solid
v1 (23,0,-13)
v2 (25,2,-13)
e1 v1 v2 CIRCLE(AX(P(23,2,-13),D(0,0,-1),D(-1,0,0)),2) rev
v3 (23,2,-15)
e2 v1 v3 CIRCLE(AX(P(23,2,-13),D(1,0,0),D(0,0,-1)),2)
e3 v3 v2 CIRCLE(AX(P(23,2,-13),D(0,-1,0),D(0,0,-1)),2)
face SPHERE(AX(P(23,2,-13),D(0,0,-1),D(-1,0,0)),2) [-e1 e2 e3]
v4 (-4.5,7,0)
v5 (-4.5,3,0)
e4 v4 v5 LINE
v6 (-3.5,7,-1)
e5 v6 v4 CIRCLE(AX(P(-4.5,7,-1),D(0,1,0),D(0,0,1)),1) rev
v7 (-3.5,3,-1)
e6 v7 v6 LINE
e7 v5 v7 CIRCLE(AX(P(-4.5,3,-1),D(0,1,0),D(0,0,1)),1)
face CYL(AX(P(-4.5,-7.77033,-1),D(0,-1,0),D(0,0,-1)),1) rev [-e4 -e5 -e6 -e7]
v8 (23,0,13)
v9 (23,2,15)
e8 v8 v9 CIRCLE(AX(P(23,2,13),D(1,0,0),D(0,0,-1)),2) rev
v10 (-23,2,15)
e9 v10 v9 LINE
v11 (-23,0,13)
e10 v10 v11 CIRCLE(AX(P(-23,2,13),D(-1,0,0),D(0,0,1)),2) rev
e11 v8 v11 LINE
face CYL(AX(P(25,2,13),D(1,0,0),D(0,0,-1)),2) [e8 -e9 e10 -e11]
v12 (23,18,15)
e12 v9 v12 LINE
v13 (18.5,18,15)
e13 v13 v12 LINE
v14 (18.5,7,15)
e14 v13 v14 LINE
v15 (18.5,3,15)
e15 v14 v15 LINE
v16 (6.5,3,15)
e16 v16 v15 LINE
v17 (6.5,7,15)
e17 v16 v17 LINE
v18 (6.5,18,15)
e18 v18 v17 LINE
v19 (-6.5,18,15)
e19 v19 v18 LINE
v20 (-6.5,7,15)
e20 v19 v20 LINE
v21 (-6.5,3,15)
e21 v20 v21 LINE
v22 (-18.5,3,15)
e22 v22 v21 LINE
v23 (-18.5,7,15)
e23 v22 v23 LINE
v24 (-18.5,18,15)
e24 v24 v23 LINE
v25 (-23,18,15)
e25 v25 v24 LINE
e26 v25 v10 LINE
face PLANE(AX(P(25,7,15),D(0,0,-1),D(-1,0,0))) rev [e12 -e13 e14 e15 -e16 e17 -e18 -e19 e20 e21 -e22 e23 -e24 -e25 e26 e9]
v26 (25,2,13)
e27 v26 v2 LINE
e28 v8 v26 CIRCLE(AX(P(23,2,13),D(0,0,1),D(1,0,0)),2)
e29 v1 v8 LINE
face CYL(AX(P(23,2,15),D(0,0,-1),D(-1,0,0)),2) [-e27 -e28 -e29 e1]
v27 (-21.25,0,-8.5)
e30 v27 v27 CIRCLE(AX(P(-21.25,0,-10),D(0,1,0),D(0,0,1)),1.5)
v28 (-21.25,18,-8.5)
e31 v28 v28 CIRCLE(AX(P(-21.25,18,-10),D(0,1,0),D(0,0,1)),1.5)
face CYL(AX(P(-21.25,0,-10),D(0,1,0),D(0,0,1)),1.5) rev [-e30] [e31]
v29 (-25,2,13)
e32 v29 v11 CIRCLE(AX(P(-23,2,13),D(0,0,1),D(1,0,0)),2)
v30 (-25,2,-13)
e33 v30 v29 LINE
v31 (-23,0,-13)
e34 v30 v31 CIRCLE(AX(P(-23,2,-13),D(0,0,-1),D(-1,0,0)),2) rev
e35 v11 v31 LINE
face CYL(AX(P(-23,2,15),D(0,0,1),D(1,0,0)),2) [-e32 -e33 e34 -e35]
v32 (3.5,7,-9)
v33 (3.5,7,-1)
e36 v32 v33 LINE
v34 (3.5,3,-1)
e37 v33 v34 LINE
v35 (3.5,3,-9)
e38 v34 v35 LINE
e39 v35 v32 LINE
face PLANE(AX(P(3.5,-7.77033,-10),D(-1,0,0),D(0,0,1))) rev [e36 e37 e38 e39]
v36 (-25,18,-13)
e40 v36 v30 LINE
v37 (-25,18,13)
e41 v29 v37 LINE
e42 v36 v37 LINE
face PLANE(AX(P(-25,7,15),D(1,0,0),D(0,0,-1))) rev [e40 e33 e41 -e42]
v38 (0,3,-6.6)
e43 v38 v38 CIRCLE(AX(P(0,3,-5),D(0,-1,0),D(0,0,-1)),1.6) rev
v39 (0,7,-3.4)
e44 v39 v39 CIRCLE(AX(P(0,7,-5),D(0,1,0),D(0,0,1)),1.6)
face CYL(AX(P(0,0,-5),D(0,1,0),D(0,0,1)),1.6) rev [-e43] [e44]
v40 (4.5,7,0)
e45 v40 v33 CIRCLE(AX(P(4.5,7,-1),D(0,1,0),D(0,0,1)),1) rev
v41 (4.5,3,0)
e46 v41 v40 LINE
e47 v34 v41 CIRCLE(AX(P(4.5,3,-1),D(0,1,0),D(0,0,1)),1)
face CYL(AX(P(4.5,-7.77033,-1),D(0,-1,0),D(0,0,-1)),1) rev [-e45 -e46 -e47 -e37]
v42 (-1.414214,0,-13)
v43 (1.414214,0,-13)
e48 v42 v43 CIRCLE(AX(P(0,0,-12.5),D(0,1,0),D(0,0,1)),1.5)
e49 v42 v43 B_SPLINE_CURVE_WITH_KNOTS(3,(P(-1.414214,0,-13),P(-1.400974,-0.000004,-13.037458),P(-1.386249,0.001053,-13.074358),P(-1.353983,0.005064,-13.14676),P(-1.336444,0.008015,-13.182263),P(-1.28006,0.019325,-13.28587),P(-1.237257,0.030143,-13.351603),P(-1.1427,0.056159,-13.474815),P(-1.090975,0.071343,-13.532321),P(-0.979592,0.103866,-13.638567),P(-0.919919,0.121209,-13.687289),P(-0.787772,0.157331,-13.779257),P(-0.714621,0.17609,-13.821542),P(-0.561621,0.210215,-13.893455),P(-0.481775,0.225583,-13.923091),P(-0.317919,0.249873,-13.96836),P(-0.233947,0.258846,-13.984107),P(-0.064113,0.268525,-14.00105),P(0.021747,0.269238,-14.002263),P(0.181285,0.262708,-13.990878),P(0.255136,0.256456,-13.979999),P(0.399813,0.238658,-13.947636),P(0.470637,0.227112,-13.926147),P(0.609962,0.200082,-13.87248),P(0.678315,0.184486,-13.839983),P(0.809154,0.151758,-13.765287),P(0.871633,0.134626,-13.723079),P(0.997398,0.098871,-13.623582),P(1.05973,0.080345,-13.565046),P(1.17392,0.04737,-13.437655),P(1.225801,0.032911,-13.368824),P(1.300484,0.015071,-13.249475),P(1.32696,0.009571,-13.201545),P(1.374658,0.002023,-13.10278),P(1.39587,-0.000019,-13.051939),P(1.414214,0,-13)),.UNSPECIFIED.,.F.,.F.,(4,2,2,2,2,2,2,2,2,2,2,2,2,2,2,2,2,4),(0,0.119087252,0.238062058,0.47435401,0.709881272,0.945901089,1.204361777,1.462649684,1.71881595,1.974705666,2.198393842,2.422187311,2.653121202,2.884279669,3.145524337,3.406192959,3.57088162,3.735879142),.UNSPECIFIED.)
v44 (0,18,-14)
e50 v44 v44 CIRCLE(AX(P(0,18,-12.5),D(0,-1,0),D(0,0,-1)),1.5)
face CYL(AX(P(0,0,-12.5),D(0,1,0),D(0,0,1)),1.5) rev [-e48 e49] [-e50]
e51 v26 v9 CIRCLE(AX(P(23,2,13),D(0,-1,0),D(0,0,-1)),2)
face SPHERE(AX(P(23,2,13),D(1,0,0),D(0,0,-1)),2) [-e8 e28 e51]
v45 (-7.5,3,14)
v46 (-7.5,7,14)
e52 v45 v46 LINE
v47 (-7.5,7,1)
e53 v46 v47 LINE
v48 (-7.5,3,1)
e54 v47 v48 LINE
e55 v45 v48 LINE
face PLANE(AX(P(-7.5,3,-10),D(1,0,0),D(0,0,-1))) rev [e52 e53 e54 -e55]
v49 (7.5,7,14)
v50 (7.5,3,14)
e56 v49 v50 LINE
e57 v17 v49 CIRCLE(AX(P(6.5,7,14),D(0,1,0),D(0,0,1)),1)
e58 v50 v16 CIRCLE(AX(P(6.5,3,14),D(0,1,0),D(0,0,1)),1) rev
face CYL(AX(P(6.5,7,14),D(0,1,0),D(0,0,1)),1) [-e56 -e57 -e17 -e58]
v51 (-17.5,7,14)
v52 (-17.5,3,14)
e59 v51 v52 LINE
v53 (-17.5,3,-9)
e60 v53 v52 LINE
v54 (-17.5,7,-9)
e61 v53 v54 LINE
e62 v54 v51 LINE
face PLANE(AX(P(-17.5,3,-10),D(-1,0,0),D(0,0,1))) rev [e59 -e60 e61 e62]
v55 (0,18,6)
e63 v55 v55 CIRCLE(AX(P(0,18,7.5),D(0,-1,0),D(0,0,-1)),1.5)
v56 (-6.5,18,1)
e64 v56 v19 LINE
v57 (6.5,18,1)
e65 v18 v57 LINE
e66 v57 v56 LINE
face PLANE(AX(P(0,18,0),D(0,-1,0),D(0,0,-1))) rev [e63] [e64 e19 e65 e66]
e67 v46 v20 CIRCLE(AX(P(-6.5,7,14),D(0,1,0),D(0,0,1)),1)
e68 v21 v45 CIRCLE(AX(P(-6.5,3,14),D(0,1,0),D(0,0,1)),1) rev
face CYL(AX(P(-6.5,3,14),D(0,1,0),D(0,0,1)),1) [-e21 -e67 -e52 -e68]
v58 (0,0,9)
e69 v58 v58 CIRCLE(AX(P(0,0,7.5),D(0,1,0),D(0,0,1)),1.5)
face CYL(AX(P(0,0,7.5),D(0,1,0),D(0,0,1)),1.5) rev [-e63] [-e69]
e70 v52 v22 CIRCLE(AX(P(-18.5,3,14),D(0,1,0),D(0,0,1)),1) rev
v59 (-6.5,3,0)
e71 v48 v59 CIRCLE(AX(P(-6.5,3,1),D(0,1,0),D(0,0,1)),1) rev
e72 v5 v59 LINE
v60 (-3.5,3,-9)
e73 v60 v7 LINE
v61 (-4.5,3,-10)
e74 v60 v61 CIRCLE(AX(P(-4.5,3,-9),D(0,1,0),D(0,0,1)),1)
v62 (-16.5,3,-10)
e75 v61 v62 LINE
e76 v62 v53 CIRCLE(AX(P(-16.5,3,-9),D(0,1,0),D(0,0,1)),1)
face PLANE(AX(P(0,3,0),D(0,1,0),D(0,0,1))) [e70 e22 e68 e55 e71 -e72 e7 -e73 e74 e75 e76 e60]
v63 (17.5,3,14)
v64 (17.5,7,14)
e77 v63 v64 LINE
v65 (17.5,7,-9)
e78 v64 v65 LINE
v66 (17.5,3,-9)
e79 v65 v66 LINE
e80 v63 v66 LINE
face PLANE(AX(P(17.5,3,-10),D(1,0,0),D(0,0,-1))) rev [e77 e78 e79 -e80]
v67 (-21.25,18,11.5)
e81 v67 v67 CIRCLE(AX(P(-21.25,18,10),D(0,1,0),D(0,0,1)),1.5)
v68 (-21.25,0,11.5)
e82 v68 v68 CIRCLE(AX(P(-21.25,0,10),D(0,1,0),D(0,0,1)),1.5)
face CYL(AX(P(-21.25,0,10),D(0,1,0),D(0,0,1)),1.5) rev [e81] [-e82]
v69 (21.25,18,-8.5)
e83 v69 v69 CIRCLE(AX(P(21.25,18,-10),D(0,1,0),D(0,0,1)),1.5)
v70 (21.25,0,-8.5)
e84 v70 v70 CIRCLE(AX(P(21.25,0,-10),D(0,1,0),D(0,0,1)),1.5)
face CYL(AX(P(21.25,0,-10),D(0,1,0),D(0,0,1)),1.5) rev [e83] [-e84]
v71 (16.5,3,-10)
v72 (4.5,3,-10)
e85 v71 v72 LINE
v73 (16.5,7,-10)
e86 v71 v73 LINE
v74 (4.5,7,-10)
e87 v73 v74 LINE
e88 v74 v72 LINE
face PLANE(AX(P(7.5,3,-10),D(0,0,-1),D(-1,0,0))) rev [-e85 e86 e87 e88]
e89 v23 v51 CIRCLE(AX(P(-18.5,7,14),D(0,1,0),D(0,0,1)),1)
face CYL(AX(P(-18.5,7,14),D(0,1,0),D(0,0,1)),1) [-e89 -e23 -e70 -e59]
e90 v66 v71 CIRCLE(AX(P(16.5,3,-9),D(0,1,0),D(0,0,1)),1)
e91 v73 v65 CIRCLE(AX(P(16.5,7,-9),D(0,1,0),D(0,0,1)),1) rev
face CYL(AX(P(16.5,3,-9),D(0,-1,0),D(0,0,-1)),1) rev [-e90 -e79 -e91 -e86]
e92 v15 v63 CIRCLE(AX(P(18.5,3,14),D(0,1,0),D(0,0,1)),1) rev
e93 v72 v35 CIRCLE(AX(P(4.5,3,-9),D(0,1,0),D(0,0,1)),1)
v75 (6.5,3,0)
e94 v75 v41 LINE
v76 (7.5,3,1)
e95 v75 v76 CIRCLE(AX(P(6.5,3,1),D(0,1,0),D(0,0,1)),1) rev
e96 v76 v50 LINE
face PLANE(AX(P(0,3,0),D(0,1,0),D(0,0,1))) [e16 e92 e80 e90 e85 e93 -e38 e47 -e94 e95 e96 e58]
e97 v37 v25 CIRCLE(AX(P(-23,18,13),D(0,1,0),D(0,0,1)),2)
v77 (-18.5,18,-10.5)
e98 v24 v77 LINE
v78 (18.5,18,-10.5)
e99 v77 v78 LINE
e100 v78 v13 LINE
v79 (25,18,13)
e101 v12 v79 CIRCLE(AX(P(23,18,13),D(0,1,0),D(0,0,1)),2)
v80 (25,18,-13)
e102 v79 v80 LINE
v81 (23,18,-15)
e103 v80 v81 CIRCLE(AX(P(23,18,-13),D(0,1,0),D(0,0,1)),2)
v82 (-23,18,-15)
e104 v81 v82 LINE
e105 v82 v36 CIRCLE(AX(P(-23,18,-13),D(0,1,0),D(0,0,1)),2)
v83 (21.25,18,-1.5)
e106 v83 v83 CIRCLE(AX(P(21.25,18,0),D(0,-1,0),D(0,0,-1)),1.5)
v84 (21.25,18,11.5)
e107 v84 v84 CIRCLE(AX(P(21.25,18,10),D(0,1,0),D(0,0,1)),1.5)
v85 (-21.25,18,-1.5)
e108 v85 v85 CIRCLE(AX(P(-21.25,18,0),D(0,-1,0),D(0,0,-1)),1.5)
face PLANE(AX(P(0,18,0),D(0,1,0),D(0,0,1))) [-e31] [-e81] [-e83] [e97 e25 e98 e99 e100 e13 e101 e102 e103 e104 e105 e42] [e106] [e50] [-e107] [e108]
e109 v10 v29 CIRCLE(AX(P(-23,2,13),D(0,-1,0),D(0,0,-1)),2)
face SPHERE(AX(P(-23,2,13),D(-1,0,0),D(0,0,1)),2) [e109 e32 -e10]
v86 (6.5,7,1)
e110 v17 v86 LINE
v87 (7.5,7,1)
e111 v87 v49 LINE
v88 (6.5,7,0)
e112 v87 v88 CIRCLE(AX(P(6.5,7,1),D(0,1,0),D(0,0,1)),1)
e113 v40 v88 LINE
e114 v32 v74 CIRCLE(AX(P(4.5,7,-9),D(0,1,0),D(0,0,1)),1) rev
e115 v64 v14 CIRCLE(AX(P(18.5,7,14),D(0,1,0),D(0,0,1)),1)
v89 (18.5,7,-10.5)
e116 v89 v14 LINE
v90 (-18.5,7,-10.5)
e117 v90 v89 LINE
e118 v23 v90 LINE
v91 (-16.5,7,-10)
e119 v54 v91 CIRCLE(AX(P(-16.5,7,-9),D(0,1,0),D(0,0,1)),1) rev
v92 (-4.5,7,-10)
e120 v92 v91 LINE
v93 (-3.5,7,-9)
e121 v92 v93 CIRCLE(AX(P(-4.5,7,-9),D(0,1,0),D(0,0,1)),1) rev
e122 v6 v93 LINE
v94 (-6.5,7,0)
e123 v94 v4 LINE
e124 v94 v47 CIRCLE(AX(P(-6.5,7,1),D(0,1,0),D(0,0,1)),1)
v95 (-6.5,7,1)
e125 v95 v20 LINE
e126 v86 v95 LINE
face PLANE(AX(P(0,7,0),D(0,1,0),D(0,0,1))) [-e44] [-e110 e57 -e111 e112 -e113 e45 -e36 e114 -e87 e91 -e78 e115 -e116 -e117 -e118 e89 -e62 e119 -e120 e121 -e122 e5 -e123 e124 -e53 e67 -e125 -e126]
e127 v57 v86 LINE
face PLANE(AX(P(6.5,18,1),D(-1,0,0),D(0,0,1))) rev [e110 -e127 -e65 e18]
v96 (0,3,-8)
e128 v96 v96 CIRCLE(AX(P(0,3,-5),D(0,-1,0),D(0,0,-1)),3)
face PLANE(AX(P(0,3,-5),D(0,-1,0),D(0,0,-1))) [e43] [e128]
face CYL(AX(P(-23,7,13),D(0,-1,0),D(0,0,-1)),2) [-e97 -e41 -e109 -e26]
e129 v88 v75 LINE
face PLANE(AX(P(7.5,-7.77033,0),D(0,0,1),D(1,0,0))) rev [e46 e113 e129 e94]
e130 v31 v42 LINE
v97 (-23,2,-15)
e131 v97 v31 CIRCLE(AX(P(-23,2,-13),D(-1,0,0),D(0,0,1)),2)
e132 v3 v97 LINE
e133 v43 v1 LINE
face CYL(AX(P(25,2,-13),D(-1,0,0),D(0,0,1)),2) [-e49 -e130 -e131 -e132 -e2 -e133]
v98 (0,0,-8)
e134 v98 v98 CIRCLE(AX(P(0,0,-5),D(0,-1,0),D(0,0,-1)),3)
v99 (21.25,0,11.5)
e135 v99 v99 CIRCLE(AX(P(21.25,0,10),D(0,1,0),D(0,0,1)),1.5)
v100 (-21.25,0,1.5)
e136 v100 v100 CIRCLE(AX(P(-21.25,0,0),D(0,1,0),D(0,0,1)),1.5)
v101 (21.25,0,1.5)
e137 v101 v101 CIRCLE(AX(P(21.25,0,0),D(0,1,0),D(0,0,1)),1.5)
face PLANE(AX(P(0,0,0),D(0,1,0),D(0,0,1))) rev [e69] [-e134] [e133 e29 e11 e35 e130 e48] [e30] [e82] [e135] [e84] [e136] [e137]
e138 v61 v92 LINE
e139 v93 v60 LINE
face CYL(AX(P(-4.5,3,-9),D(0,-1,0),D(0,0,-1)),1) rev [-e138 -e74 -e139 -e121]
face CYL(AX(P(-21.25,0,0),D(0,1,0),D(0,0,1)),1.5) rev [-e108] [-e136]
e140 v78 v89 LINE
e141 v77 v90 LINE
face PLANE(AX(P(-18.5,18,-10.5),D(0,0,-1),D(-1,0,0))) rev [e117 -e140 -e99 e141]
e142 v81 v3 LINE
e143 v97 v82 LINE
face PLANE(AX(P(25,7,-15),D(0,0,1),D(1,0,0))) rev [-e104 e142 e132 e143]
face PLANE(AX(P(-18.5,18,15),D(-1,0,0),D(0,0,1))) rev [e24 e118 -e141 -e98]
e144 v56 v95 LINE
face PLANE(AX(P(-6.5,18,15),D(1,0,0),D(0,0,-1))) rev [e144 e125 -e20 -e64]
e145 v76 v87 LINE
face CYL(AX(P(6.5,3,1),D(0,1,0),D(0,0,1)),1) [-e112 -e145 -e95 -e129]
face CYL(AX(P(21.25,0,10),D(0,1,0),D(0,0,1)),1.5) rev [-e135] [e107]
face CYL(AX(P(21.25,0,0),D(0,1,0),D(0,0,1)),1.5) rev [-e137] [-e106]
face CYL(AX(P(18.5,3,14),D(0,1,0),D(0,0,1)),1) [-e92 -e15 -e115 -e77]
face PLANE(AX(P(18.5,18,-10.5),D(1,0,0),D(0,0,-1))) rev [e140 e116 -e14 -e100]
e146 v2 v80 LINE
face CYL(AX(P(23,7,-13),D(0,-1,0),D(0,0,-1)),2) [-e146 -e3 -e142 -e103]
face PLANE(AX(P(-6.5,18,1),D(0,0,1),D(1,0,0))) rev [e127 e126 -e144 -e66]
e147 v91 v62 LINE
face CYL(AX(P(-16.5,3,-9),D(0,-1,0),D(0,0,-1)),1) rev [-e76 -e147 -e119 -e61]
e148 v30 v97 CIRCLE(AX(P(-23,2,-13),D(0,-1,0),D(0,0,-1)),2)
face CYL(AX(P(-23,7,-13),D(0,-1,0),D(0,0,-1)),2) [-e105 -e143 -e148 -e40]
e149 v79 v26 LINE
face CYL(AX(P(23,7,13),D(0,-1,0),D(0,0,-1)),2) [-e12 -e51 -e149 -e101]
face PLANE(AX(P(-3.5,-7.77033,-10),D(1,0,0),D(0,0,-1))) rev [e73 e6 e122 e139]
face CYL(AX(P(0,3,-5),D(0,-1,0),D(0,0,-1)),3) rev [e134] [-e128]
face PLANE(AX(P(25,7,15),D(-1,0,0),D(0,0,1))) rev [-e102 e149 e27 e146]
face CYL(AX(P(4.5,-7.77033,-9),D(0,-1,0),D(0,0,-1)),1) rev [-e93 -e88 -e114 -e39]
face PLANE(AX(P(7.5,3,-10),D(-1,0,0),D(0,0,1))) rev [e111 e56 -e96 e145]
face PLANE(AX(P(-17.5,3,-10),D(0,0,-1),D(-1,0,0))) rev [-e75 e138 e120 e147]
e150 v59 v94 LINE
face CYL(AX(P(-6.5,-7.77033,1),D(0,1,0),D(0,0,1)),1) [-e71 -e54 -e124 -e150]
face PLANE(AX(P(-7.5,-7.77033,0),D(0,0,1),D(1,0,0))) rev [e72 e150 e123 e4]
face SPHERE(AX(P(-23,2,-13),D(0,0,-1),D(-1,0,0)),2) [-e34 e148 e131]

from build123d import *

# Parameters (mm, degrees)
SKETCH_1_W          = 50
SKETCH_1_H          = 30
EXTRUDE_1_DEPTH     = 7
SKETCH_2_W          = 10
SKETCH_2_H          = 25
CUT_EXTRUDE_1_DEPTH = 4
SKETCH_4_R          = 1.6
CUT_EXTRUDE_3_DEPTH = 30.983328701
SKETCH_5_R          = 3
CUT_EXTRUDE_4_DEPTH = 3
SKETCH_6_R          = 1.5
CUT_EXTRUDE_5_DEPTH = 30.983328701
SKETCH_7_W          = 13
SKETCH_7_H          = 14
EXTRUDE_6_DEPTH     = 11
SKETCH_8_R          = 1.5
CUT_EXTRUDE_6_DEPTH = 32.160872902
SKETCH_9_R          = 1.5
CUT_EXTRUDE_7_DEPTH = 35.263683398
FILLET_1_R          = 2
SKETCH_10_W         = 4
SKETCH_10_H         = 10
CUT_EXTRUDE_8_DEPTH = 4
FILLET_2_R          = 1
FILLET_3_R          = 1


with BuildPart() as part:
    # Эскиз1 → Бобышка-Вытянуть1 (new body)
    with BuildSketch(Plane(origin=(0, 0, 0), x_dir=(1, 0, 0), z_dir=(0, 1, 0))):
        Rectangle(SKETCH_1_W, SKETCH_1_H)
    extrude(amount=EXTRUDE_1_DEPTH)

    # Эскиз2 → Вырез-Вытянуть1 (cut)
    with BuildSketch(Plane(origin=(0, 7, 0), x_dir=(1, 0, 0), z_dir=(0, 1, 0))):
        with Locations((-12.5, -2.5)):
            Rectangle(SKETCH_2_W, SKETCH_2_H)
        with Locations((12.5, -2.5)):
            Rectangle(SKETCH_2_W, SKETCH_2_H)
    extrude(amount=-CUT_EXTRUDE_1_DEPTH, mode=Mode.SUBTRACT)

    # Эскиз4 → Вырез-Вытянуть3 (cut, through all)
    with BuildSketch(Plane(origin=(0, 7, 0), x_dir=(1, 0, 0), z_dir=(0, 1, 0))):
        with Locations(Location((0, 5, 0), (0, 0, 270))):
            Circle(SKETCH_4_R)
    extrude(amount=-CUT_EXTRUDE_3_DEPTH, mode=Mode.SUBTRACT)

    # Эскиз5 → Вырез-Вытянуть4 (cut)
    with BuildSketch(Plane.XZ):
        with Locations(Location((0, -5, 0), (0, 0, 270))):
            Circle(SKETCH_5_R)
    extrude(amount=-CUT_EXTRUDE_4_DEPTH, mode=Mode.SUBTRACT)

    # Эскиз6 → Вырез-Вытянуть5 (cut, through all)
    with BuildSketch(Plane(origin=(0, 7, 0), x_dir=(1, 0, 0), z_dir=(0, 1, 0))):
        with Locations(Location((-21.25, 0, 0), (0, 0, 270))):
            Circle(SKETCH_6_R)
        with Locations(Location((0, 12.5, 0), (0, 0, 270))):
            Circle(SKETCH_6_R)
        with Locations(Location((21.25, 0, 0), (0, 0, 270))):
            Circle(SKETCH_6_R)
        with Locations(Location((0, -7.5, 0), (0, 0, 270))):
            Circle(SKETCH_6_R)
    extrude(amount=-CUT_EXTRUDE_5_DEPTH, mode=Mode.SUBTRACT)

    # Эскиз7 → Бобышка-Вытянуть6 (add)
    with BuildSketch(Plane(origin=(0, 7, 0), x_dir=(1, 0, 0), z_dir=(0, 1, 0))):
        Polygon((-25, 15), (25, 15), (25, -15), (18.5, -15), (18.5, 10.5), (-18.5, 10.5), (-18.5, -15), (-25, -15), align=None)
        with Locations((0, -8)):
            Rectangle(SKETCH_7_W, SKETCH_7_H)
    extrude(amount=EXTRUDE_6_DEPTH)

    # Эскиз8 → Вырез-Вытянуть6 (cut, through all)
    with BuildSketch(Plane.XZ.offset(-7)):
        with Locations(Location((21.25, 0, 0), (0, 0, 90))):
            Circle(SKETCH_8_R)
        with Locations(Location((0, 7.5, 0), (0, 0, 90))):
            Circle(SKETCH_8_R)
        with Locations(Location((-21.25, 0, 0), (0, 0, 90))):
            Circle(SKETCH_8_R)
        with Locations(Location((0, -12.5, 0), (0, 0, 90))):
            Circle(SKETCH_8_R)
    extrude(amount=-CUT_EXTRUDE_6_DEPTH, mode=Mode.SUBTRACT)

    # Эскиз9 → Вырез-Вытянуть7 (cut, through all)
    with BuildSketch(Plane(origin=(0, 18, 0), x_dir=(1, 0, 0), z_dir=(0, 1, 0))):
        with Locations(Location((-21.25, 10, 0), (0, 0, 270))):
            Circle(SKETCH_9_R)
        with Locations(Location((21.25, 10, 0), (0, 0, 270))):
            Circle(SKETCH_9_R)
        with Locations(Location((21.25, -10, 0), (0, 0, 270))):
            Circle(SKETCH_9_R)
        with Locations(Location((-21.25, -10, 0), (0, 0, 270))):
            Circle(SKETCH_9_R)
    extrude(amount=-CUT_EXTRUDE_7_DEPTH, mode=Mode.SUBTRACT)

    # Скругление1
    # the kernel refuses this fillet: 2 mm, written as the material it takes off along each edge
    with BuildSketch(Plane(origin=(-23, 2, -13), x_dir=(0, -1, 0), z_dir=(-1, 0, 0))) as fillet_1_piece_1_section:
        Polygon((0, 0), (FILLET_1_R, 0), (FILLET_1_R, -FILLET_1_R), (0, -FILLET_1_R), align=None)
    fillet_1_piece_1 = extrude(amount=FILLET_1_R, mode=Mode.PRIVATE)
    fillet_1_piece_1 = fillet_1_piece_1 - Plane(origin=(-23, 2, -13), x_dir=(0, 0.7071067811865475, 0.7071067811865475), z_dir=(-1, 0, 0)) * Sphere(FILLET_1_R, mode=Mode.PRIVATE)
    add(fillet_1_piece_1, mode=Mode.SUBTRACT)
    with BuildSketch(Plane(origin=(23, 2, -13), x_dir=(1, 0, 0), z_dir=(0, -1, 0))) as fillet_1_piece_2_section:
        Polygon((0, 0), (FILLET_1_R, 0), (FILLET_1_R, -FILLET_1_R), (0, -FILLET_1_R), align=None)
    fillet_1_piece_2 = extrude(amount=FILLET_1_R, mode=Mode.PRIVATE)
    fillet_1_piece_2 = fillet_1_piece_2 - Plane(origin=(23, 2, -13), x_dir=(-0.7071067811865474, 0, 0.7071067811865477), z_dir=(0, -1, 0)) * Sphere(FILLET_1_R, mode=Mode.PRIVATE)
    add(fillet_1_piece_2, mode=Mode.SUBTRACT)
    with BuildSketch(Plane(origin=(23, 2, 13), x_dir=(0, -1, 0), z_dir=(0, 0, 1))) as fillet_1_piece_3_section:
        Polygon((0, 0), (FILLET_1_R, 0), (FILLET_1_R, FILLET_1_R), (0, FILLET_1_R), align=None)
    fillet_1_piece_3 = extrude(amount=FILLET_1_R, mode=Mode.PRIVATE)
    fillet_1_piece_3 = fillet_1_piece_3 - Plane(origin=(23, 2, 13), x_dir=(-0.7071067811865475, 0.7071067811865475, 0), z_dir=(0, 0, 1)) * Sphere(FILLET_1_R, mode=Mode.PRIVATE)
    add(fillet_1_piece_3, mode=Mode.SUBTRACT)
    with BuildSketch(Plane(origin=(-23, 2, 13), x_dir=(0, -1, 0), z_dir=(0, 0, 1))) as fillet_1_piece_4_section:
        Polygon((0, 0), (FILLET_1_R, 0), (FILLET_1_R, -FILLET_1_R), (0, -FILLET_1_R), align=None)
    fillet_1_piece_4 = extrude(amount=FILLET_1_R, mode=Mode.PRIVATE)
    fillet_1_piece_4 = fillet_1_piece_4 - Plane(origin=(-23, 2, 13), x_dir=(0.7071067811865475, 0.7071067811865475, 0), z_dir=(0, 0, 1)) * Sphere(FILLET_1_R, mode=Mode.PRIVATE)
    add(fillet_1_piece_4, mode=Mode.SUBTRACT)
    with BuildSketch(Plane(origin=(-23, 0, -15), x_dir=(0, 0, 1), z_dir=(1, 0, 0))) as fillet_1_piece_5:
        with BuildLine():
            CenterArc((FILLET_1_R, -FILLET_1_R), FILLET_1_R, 90, 90)
            Line((0, -FILLET_1_R), (0, 0))
            Line((0, 0), (FILLET_1_R, 0))
        make_face()
    extrude(amount=46, mode=Mode.SUBTRACT)
    with BuildSketch(Plane(origin=(25, 0, -13), x_dir=(-1, 0, 0), z_dir=(0, 0, 1)), Plane(origin=(-25, 0, 13), x_dir=(1, 0, 0), z_dir=(0, 0, -1))) as fillet_1_piece_6:
        with BuildLine():
            CenterArc((FILLET_1_R, -FILLET_1_R), FILLET_1_R, 90, 90)
            Line((0, -FILLET_1_R), (0, 0))
            Line((0, 0), (FILLET_1_R, 0))
        make_face()
    extrude(amount=26, mode=Mode.SUBTRACT)
    with BuildSketch(Plane(origin=(23, 0, 15), x_dir=(0, 1, 0), z_dir=(-1, 0, 0))) as fillet_1_piece_7:
        with BuildLine():
            CenterArc((FILLET_1_R, FILLET_1_R), FILLET_1_R, 180, 90)
            Line((0, FILLET_1_R), (0, 0))
            Line((0, 0), (FILLET_1_R, 0))
        make_face()
    extrude(amount=46, mode=Mode.SUBTRACT)
    with BuildSketch(Plane(origin=(-25, 23, -15), x_dir=(0, 0, 1), z_dir=(0, -1, 0)), Plane(origin=(25, 2, -15), x_dir=(0, 0, 1), z_dir=(0, 1, 0)), Plane(origin=(25, 2, 15), x_dir=(-1, 0, 0), z_dir=(0, 1, 0)), Plane(origin=(-25, 23, 15), x_dir=(1, 0, 0), z_dir=(0, -1, 0))) as fillet_1_piece_8:
        with BuildLine():
            CenterArc((FILLET_1_R, -FILLET_1_R), FILLET_1_R, 90, 90)
            Line((0, -FILLET_1_R), (0, 0))
            Line((0, 0), (FILLET_1_R, 0))
        make_face()
    extrude(amount=21, mode=Mode.SUBTRACT)

    # Эскиз10 → Вырез-Вытянуть8 (cut)
    with BuildSketch(Plane(origin=(0, 7, 0), x_dir=(1, 0, 0), z_dir=(0, 1, 0))):
        with Locations((-5.5, 5)):
            Rectangle(SKETCH_10_W, SKETCH_10_H)
        with Locations((5.5, 5)):
            Rectangle(SKETCH_10_W, SKETCH_10_H)
    extrude(amount=-CUT_EXTRUDE_8_DEPTH, mode=Mode.SUBTRACT)

    # Скругление2
    fillet_2_edges = [part.edges().sort_by_distance(p)[0] for p in [
        (-7.5, 5, 0),
        (-3.5, 5, -10),
        (-3.5, 5, 0),
        (7.5, 5, 0),
        (3.5, 5, 0),
        (3.5, 5, -10),
    ]]
    fillet(fillet_2_edges, radius=FILLET_2_R)

    # Скругление3
    fillet_3_edges = [part.edges().sort_by_distance(p)[0] for p in [
        (17.5, 5, -10),
        (17.5, 5, 15),
        (7.5, 5, 15),
        (-7.5, 5, 15),
        (-17.5, 5, 15),
        (-17.5, 5, -10),
    ]]
    fillet(fillet_3_edges, radius=FILLET_3_R)


solid = part.part
